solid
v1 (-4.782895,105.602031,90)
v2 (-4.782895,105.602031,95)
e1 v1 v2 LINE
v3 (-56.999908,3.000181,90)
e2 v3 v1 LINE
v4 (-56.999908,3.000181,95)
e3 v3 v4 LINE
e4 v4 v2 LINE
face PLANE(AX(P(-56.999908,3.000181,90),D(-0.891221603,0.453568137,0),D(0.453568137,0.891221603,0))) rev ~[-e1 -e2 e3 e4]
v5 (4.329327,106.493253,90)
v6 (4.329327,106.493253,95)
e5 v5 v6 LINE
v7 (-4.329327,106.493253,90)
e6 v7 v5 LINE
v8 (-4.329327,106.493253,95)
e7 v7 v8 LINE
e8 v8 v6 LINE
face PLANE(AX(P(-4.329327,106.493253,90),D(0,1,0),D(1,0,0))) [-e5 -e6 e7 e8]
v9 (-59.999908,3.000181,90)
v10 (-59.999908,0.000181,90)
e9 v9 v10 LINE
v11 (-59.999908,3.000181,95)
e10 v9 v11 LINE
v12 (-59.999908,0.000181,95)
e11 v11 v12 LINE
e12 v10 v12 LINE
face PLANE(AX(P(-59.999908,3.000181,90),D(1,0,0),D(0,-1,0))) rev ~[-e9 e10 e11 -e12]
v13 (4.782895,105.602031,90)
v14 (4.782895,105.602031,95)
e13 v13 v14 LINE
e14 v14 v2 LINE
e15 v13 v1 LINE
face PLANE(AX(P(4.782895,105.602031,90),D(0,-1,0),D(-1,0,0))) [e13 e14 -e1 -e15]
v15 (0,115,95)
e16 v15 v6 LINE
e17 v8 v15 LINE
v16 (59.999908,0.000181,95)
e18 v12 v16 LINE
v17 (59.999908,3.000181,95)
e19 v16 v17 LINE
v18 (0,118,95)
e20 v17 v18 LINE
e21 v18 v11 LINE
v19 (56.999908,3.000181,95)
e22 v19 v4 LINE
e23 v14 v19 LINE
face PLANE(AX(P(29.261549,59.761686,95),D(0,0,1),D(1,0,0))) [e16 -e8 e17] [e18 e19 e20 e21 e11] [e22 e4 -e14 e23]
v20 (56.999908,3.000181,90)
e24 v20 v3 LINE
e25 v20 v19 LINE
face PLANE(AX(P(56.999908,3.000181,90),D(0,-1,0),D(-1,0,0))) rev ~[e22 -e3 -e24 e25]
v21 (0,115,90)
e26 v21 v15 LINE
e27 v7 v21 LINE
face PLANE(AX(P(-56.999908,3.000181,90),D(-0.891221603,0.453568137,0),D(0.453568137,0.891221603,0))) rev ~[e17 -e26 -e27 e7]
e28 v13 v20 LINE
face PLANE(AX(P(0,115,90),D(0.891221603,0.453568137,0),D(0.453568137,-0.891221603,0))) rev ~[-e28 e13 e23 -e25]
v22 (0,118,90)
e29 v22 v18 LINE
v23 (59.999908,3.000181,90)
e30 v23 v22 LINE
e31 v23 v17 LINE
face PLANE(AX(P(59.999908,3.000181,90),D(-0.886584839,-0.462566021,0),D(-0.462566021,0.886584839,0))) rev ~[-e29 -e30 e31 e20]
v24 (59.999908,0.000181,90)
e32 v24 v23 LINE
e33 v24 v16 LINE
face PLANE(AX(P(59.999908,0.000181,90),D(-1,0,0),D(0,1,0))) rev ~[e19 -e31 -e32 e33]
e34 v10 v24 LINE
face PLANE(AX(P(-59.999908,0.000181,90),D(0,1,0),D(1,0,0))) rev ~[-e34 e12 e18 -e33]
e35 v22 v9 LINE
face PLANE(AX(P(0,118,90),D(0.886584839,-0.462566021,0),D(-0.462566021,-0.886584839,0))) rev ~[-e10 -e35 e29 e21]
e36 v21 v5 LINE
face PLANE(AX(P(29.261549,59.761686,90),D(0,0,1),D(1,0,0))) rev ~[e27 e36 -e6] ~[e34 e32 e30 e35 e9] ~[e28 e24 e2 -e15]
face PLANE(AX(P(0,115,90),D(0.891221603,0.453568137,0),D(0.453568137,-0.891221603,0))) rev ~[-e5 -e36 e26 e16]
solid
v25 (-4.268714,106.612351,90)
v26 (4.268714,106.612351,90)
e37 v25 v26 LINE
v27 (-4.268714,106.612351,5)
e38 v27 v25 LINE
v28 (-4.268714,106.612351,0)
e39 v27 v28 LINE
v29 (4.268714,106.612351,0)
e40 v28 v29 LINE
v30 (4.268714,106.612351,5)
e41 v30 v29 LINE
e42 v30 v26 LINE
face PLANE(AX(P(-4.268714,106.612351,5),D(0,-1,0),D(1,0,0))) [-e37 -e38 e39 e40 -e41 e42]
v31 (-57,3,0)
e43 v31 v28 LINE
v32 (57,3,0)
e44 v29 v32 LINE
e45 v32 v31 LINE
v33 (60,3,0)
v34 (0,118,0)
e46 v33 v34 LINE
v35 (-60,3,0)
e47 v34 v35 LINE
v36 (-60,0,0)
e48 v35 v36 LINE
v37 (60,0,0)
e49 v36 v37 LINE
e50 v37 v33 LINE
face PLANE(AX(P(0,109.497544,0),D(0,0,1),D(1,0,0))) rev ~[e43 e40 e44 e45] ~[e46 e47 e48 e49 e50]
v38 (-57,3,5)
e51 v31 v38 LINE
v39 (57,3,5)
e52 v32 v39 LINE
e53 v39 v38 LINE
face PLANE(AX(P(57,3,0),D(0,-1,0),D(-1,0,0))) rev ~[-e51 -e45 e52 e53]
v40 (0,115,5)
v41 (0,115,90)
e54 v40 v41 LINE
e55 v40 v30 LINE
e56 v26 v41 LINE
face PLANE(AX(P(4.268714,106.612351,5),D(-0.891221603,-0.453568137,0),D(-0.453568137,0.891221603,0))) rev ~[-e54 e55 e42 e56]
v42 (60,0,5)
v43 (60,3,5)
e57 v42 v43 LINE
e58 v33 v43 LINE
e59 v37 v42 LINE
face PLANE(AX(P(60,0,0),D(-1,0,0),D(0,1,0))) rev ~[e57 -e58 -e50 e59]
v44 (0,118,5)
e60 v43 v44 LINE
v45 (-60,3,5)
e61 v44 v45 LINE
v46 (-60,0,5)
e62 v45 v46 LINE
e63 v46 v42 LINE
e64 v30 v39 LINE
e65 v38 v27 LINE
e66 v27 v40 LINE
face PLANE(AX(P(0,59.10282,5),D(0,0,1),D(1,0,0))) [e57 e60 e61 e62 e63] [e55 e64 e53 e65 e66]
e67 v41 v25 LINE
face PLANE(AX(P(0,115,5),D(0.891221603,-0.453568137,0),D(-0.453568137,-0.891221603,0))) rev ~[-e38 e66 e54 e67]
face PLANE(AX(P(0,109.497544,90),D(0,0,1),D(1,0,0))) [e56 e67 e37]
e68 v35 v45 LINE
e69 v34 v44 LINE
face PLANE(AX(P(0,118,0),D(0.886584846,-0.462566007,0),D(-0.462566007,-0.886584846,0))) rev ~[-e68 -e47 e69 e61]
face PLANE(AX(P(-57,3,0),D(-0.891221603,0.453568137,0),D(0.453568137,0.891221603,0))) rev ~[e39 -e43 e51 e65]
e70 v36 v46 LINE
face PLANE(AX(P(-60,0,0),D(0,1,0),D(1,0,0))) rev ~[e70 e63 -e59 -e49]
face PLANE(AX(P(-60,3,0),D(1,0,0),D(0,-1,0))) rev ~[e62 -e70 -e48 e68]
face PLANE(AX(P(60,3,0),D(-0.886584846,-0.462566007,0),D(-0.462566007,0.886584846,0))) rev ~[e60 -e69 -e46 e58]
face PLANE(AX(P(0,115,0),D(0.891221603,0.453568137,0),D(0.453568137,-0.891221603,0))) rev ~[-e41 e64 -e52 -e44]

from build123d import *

# Parameters (mm, degrees)
F1_DEPTH      = 5
F3_DEPTH      = 85
F3_DEPTH_BACK = 5
F5_DEPTH      = 5
F7_DEPTH      = 5


# Not quite as in the source:
# - a feature names something its author has since deleted; it is built from what else it names


with BuildPart() as f1:
    # F0 (on Top) → F1 (new body)
    with BuildSketch(Plane.XY):
        Polygon((0, 118), (-60, 3), (-57, 3), (0, 115), (57, 3), (60, 3), align=None)
        Polygon((-60, 0), (0, 0), (60, 0), (60, 3), (57, 3), (-57, 3), (-60, 3), align=None)
    extrude(amount=F1_DEPTH)

    # F2 (on face) → F3 (join, two sides)
    with BuildSketch(Plane.XY.offset(5)) as f3_sk:
        Polygon((-4.2687140089, 106.6123514211), (4.2687140089, 106.6123514211), (0, 115), align=None)
    extrude(amount=F3_DEPTH)
    extrude(f3_sk.sketch, amount=-F3_DEPTH_BACK)


with BuildPart() as f5:
    # F4 (on face) → F5 (new body)
    with BuildSketch(Plane.XY.offset(90)):
        Polygon((0, 118), (0, 115), (4.2687140089, 106.6123514211), (56.999907785, 3.0001811943), (59.999907785, 3.0001811943), align=None)
        Polygon((-4.2687140089, 106.6123514211), (0, 115), (0, 118), (-59.999907785, 3.0001811943), (-56.999907785, 3.0001811943), align=None)
        Polygon((56.999907785, 3.0001811943), (-56.999907785, 3.0001811943), (-59.999907785, 3.0001811943), (-59.999907785, 0.0001811943), (59.999907785, 0.0001811943), (59.999907785, 3.0001811943), align=None)
    extrude(amount=F5_DEPTH)

    # F6 (on face) → F7 (join)
    with BuildSketch(Plane(origin=(0, 0, 90), x_dir=(1, 0, 0), z_dir=(0, 0, -1))):
        Polygon((-4.782894762, -105.6020313448), (-4.3293266249, -106.4932529475), (4.3293266249, -106.4932529475), (4.782894762, -105.6020313448), align=None)
    extrude(amount=-F7_DEPTH)


solid = Compound([f1.part, f5.part])
